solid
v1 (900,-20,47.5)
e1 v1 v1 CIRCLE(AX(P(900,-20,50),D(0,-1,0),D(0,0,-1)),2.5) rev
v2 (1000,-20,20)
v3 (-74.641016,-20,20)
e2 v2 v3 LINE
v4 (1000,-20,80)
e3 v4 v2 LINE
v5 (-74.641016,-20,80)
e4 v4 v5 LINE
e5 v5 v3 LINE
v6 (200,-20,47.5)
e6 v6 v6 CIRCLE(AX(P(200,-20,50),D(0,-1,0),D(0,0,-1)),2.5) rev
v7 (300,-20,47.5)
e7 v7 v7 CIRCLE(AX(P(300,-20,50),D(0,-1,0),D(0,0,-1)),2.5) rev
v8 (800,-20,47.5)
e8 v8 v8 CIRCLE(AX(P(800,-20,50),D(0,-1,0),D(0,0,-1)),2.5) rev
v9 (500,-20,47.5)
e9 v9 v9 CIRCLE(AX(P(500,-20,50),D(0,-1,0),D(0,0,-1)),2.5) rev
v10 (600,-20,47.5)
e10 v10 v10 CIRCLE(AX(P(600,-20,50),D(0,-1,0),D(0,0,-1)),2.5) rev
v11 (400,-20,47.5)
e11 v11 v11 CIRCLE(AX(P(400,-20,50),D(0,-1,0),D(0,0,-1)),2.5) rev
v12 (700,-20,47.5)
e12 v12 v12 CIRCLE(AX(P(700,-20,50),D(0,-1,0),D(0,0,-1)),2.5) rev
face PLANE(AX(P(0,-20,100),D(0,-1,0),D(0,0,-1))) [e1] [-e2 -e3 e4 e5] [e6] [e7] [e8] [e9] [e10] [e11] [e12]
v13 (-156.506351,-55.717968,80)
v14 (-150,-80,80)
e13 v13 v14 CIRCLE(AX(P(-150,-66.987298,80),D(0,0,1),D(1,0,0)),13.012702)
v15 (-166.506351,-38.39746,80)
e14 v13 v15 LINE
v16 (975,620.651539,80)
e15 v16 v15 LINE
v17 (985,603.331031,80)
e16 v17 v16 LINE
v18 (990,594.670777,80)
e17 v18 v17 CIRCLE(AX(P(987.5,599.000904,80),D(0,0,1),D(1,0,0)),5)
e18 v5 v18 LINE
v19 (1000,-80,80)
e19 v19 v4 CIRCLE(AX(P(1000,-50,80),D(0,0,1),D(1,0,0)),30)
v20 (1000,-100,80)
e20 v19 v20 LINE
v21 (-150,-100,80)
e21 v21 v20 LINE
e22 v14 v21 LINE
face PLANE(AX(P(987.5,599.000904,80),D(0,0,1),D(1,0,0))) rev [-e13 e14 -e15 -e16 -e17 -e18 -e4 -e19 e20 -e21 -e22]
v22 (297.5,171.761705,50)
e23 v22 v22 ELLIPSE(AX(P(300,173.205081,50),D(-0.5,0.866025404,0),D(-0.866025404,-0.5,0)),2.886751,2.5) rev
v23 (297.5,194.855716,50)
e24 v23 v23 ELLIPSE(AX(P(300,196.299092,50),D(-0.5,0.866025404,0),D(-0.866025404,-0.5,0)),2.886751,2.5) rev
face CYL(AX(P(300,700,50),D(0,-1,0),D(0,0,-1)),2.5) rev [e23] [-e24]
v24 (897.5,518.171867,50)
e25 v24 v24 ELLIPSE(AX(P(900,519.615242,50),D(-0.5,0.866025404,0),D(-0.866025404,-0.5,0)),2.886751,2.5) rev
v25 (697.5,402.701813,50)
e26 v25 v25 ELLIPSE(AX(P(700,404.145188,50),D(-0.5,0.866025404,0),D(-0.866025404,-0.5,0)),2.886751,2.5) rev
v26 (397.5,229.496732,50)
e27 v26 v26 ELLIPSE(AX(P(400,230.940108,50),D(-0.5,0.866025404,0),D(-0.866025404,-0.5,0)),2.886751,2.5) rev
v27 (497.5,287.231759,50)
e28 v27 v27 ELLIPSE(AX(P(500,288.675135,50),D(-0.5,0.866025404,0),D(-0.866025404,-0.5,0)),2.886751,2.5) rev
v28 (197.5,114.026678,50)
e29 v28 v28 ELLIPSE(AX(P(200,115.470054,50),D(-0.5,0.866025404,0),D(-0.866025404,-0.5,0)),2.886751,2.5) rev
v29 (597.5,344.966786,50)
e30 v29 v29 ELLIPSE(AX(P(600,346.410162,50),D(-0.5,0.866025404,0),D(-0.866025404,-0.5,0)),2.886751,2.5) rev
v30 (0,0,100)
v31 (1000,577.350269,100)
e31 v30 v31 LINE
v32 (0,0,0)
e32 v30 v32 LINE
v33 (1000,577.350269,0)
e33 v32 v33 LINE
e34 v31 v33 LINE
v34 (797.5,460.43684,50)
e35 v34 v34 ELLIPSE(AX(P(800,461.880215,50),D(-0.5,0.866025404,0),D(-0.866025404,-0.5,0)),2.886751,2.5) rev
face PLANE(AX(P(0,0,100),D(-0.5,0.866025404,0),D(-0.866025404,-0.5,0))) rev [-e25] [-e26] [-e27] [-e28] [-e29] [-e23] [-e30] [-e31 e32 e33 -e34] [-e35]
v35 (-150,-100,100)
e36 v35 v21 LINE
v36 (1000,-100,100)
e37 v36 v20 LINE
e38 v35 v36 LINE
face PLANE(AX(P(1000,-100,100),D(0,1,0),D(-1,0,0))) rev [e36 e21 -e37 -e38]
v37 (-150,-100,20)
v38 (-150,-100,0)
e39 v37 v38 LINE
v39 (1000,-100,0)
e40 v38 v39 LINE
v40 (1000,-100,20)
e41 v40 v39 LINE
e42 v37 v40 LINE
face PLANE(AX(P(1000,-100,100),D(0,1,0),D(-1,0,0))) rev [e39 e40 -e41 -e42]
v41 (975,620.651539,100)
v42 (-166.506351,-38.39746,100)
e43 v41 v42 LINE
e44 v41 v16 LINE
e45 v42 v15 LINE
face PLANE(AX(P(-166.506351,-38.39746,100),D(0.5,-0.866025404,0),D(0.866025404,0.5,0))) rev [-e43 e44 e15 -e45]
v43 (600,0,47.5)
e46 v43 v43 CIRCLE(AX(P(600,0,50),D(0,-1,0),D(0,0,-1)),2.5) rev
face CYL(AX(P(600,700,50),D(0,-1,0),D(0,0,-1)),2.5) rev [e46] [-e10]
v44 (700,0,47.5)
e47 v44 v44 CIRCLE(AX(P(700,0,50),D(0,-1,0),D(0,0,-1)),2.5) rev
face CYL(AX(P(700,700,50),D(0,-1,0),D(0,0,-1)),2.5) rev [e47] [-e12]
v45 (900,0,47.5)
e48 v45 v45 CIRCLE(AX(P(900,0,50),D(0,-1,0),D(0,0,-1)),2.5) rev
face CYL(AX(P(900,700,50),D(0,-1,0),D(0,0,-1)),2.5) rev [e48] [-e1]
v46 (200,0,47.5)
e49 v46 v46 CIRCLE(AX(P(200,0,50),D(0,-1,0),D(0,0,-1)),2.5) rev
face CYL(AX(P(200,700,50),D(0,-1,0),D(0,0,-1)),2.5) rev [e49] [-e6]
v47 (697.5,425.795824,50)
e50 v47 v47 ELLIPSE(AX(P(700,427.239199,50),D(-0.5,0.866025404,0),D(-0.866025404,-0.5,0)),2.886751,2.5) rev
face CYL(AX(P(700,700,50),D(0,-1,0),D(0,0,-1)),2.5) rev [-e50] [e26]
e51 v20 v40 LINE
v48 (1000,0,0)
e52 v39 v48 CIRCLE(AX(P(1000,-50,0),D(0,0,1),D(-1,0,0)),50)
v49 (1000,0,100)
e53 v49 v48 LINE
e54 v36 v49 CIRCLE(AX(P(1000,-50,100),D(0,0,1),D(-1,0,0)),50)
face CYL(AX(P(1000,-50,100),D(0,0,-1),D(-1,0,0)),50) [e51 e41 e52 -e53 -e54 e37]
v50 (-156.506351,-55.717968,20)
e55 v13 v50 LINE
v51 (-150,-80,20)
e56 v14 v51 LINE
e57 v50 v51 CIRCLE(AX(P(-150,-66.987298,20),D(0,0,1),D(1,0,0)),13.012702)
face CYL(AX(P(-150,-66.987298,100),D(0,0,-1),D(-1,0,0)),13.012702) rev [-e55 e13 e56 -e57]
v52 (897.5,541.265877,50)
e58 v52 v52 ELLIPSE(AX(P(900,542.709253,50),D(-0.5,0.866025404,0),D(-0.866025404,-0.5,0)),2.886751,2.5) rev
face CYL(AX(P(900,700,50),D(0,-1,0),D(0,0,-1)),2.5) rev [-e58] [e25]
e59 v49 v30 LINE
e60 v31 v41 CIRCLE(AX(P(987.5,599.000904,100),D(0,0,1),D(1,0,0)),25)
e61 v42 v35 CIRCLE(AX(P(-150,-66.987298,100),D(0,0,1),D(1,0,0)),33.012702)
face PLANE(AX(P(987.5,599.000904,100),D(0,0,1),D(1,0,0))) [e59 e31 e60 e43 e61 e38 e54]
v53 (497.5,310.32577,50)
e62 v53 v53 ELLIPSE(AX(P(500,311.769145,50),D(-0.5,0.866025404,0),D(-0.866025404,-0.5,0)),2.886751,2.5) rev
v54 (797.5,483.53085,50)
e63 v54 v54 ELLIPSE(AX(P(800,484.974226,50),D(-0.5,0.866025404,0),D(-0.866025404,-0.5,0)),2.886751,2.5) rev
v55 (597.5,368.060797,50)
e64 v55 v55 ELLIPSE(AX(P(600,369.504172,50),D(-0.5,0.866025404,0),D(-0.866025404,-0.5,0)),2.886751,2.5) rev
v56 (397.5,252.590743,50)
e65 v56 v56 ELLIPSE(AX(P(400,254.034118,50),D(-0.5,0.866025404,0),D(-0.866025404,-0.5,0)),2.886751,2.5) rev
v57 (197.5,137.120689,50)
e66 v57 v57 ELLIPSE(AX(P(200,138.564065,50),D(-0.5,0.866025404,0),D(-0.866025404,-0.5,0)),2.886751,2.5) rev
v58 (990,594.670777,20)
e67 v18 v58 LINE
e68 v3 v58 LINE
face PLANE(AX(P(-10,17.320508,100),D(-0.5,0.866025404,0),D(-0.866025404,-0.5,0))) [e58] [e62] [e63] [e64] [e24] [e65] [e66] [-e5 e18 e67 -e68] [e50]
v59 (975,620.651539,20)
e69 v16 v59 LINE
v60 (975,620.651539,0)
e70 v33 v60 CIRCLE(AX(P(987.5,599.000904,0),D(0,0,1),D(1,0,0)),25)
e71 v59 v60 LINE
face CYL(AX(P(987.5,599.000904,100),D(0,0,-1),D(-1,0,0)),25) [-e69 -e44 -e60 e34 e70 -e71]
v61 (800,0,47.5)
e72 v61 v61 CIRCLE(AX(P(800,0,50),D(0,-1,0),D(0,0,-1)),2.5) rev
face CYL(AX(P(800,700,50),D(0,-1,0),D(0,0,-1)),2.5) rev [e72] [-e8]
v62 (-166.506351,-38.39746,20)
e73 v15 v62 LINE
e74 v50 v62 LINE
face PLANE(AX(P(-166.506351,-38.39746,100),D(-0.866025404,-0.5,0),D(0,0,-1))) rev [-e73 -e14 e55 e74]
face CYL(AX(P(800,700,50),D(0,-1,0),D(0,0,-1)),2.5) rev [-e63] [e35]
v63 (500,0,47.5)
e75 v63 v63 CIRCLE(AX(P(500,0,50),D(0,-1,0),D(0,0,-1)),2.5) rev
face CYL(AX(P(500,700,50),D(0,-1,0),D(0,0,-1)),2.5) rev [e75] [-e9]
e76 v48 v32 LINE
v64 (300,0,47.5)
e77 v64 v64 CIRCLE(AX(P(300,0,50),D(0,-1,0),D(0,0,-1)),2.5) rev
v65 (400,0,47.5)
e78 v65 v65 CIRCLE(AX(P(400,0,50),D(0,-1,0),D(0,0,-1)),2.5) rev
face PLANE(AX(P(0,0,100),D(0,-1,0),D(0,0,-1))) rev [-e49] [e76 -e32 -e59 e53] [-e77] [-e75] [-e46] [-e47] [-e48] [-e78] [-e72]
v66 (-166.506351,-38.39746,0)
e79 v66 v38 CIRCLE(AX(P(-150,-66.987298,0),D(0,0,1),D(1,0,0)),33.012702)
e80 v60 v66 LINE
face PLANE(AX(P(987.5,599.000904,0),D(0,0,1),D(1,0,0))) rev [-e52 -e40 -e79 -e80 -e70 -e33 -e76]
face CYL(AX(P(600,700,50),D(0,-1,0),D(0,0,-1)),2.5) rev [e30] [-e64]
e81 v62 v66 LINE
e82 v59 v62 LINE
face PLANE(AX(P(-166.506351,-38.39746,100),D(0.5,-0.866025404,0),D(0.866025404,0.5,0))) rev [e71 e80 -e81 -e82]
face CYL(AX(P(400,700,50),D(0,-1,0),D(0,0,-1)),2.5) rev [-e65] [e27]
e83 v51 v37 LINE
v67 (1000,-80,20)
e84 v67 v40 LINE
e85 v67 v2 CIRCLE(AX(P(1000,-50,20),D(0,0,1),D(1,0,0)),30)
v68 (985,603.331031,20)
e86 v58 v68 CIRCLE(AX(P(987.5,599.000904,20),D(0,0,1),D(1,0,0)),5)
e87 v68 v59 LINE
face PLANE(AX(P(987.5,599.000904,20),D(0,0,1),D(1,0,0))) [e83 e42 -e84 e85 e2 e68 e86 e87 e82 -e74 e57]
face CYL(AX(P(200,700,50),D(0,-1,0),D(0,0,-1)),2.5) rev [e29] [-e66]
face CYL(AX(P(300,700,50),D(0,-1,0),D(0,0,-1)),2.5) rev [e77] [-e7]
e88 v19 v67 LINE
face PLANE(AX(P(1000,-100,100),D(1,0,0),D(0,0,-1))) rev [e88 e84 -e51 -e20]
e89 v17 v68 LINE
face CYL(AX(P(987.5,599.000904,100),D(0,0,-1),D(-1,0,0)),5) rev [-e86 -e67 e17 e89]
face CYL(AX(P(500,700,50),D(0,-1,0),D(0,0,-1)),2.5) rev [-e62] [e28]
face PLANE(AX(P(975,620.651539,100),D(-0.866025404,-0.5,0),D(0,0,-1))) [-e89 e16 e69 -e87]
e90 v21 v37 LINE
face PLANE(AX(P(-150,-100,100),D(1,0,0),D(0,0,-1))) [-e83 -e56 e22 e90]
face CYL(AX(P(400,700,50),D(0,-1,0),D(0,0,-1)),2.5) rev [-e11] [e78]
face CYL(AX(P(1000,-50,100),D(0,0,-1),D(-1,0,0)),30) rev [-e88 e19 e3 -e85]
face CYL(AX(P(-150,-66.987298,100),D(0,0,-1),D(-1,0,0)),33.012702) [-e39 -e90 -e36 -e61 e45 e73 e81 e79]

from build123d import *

# Parameters (mm, degrees)
BOSS_EXTRUDE1_DEPTH     = 100
SHELL1_START            = 20
SHELL1_DEPTH            = 60
CUT_EXTRUDE5_DEPTH      = 700
CUT_EXTRUDE5_DEPTH_BACK = 1226.510966311
SKETCH3_R               = 2.5


# Read off the part's stored shape, not the designer's step: Shell1
with BuildPart() as part:
    # Sketch1 → Boss-Extrude1 (new body)
    with BuildSketch(Plane.XY):
        with BuildLine():
            Line((0, 0), (1000, 0))
            ThreePointArc((1000, 0), (1050, -50), (1000, -100))
            Line((1000, -100), (-150, -100))
            ThreePointArc((-150, -100), (-181.887821353, -75.531614088), (-166.506350946, -38.397459622))
            Line((-166.506350946, -38.397459622), (975, 620.651539379))
            ThreePointArc((975, 620.651539379), (1009.150635095, 611.500904284), (1000, 577.35026919))
            Line((1000, 577.35026919), (0, 0))
        make_face()
    extrude(amount=BOSS_EXTRUDE1_DEPTH)

    # Shell1 outline → Shell1 (cut)
    with BuildSketch(Plane.XY.offset(SHELL1_START)):
        with BuildLine():
            Line((-150, -80), (-150, -100))
            Line((-150, -100), (1000, -100))
            Line((1000, -100), (1000, -80))
            ThreePointArc((1000, -80), (1030, -50), (1000, -20))
            Line((1000, -20), (-74.641016151, -20))
            Line((-74.641016151, -20), (990, 594.670777265))
            ThreePointArc((990, 594.670777265), (991.830127019, 601.500904284), (985, 603.331031303))
            Line((985, 603.331031303), (975, 620.651539379))
            Line((975, 620.651539379), (-166.506350946, -38.397459622))
            Line((-166.506350946, -38.397459622), (-156.506350946, -55.717967697))
            ThreePointArc((-156.506350946, -55.717967697), (-162.569304827, -70.355233185), (-150, -80))
        make_face()
    extrude(amount=SHELL1_DEPTH, mode=Mode.SUBTRACT)

    # Sketch3 → Cut-Extrude5 (cut, two sides: drawn at the far end of the back side and taken through both)
    with BuildSketch(Plane(origin=(0, 0, 0), x_dir=(1, 0, 0), z_dir=(0, 1, 0)).offset(-CUT_EXTRUDE5_DEPTH_BACK)):
        with Locations(Location((200, -50, 0), (0, 0, 90))):
            Circle(SKETCH3_R)
        with Locations(Location((300, -50, 0), (0, 0, 90))):
            Circle(SKETCH3_R)
        with Locations(Location((400, -50, 0), (0, 0, 90))):
            Circle(SKETCH3_R)
        with Locations(Location((500, -50, 0), (0, 0, 90))):
            Circle(SKETCH3_R)
        with Locations(Location((600, -50, 0), (0, 0, 90))):
            Circle(SKETCH3_R)
        with Locations(Location((700, -50, 0), (0, 0, 90))):
            Circle(SKETCH3_R)
        with Locations(Location((800, -50, 0), (0, 0, 90))):
            Circle(SKETCH3_R)
        with Locations(Location((900, -50, 0), (0, 0, 90))):
            Circle(SKETCH3_R)
    extrude(amount=CUT_EXTRUDE5_DEPTH + CUT_EXTRUDE5_DEPTH_BACK, mode=Mode.SUBTRACT)


solid = part.part
